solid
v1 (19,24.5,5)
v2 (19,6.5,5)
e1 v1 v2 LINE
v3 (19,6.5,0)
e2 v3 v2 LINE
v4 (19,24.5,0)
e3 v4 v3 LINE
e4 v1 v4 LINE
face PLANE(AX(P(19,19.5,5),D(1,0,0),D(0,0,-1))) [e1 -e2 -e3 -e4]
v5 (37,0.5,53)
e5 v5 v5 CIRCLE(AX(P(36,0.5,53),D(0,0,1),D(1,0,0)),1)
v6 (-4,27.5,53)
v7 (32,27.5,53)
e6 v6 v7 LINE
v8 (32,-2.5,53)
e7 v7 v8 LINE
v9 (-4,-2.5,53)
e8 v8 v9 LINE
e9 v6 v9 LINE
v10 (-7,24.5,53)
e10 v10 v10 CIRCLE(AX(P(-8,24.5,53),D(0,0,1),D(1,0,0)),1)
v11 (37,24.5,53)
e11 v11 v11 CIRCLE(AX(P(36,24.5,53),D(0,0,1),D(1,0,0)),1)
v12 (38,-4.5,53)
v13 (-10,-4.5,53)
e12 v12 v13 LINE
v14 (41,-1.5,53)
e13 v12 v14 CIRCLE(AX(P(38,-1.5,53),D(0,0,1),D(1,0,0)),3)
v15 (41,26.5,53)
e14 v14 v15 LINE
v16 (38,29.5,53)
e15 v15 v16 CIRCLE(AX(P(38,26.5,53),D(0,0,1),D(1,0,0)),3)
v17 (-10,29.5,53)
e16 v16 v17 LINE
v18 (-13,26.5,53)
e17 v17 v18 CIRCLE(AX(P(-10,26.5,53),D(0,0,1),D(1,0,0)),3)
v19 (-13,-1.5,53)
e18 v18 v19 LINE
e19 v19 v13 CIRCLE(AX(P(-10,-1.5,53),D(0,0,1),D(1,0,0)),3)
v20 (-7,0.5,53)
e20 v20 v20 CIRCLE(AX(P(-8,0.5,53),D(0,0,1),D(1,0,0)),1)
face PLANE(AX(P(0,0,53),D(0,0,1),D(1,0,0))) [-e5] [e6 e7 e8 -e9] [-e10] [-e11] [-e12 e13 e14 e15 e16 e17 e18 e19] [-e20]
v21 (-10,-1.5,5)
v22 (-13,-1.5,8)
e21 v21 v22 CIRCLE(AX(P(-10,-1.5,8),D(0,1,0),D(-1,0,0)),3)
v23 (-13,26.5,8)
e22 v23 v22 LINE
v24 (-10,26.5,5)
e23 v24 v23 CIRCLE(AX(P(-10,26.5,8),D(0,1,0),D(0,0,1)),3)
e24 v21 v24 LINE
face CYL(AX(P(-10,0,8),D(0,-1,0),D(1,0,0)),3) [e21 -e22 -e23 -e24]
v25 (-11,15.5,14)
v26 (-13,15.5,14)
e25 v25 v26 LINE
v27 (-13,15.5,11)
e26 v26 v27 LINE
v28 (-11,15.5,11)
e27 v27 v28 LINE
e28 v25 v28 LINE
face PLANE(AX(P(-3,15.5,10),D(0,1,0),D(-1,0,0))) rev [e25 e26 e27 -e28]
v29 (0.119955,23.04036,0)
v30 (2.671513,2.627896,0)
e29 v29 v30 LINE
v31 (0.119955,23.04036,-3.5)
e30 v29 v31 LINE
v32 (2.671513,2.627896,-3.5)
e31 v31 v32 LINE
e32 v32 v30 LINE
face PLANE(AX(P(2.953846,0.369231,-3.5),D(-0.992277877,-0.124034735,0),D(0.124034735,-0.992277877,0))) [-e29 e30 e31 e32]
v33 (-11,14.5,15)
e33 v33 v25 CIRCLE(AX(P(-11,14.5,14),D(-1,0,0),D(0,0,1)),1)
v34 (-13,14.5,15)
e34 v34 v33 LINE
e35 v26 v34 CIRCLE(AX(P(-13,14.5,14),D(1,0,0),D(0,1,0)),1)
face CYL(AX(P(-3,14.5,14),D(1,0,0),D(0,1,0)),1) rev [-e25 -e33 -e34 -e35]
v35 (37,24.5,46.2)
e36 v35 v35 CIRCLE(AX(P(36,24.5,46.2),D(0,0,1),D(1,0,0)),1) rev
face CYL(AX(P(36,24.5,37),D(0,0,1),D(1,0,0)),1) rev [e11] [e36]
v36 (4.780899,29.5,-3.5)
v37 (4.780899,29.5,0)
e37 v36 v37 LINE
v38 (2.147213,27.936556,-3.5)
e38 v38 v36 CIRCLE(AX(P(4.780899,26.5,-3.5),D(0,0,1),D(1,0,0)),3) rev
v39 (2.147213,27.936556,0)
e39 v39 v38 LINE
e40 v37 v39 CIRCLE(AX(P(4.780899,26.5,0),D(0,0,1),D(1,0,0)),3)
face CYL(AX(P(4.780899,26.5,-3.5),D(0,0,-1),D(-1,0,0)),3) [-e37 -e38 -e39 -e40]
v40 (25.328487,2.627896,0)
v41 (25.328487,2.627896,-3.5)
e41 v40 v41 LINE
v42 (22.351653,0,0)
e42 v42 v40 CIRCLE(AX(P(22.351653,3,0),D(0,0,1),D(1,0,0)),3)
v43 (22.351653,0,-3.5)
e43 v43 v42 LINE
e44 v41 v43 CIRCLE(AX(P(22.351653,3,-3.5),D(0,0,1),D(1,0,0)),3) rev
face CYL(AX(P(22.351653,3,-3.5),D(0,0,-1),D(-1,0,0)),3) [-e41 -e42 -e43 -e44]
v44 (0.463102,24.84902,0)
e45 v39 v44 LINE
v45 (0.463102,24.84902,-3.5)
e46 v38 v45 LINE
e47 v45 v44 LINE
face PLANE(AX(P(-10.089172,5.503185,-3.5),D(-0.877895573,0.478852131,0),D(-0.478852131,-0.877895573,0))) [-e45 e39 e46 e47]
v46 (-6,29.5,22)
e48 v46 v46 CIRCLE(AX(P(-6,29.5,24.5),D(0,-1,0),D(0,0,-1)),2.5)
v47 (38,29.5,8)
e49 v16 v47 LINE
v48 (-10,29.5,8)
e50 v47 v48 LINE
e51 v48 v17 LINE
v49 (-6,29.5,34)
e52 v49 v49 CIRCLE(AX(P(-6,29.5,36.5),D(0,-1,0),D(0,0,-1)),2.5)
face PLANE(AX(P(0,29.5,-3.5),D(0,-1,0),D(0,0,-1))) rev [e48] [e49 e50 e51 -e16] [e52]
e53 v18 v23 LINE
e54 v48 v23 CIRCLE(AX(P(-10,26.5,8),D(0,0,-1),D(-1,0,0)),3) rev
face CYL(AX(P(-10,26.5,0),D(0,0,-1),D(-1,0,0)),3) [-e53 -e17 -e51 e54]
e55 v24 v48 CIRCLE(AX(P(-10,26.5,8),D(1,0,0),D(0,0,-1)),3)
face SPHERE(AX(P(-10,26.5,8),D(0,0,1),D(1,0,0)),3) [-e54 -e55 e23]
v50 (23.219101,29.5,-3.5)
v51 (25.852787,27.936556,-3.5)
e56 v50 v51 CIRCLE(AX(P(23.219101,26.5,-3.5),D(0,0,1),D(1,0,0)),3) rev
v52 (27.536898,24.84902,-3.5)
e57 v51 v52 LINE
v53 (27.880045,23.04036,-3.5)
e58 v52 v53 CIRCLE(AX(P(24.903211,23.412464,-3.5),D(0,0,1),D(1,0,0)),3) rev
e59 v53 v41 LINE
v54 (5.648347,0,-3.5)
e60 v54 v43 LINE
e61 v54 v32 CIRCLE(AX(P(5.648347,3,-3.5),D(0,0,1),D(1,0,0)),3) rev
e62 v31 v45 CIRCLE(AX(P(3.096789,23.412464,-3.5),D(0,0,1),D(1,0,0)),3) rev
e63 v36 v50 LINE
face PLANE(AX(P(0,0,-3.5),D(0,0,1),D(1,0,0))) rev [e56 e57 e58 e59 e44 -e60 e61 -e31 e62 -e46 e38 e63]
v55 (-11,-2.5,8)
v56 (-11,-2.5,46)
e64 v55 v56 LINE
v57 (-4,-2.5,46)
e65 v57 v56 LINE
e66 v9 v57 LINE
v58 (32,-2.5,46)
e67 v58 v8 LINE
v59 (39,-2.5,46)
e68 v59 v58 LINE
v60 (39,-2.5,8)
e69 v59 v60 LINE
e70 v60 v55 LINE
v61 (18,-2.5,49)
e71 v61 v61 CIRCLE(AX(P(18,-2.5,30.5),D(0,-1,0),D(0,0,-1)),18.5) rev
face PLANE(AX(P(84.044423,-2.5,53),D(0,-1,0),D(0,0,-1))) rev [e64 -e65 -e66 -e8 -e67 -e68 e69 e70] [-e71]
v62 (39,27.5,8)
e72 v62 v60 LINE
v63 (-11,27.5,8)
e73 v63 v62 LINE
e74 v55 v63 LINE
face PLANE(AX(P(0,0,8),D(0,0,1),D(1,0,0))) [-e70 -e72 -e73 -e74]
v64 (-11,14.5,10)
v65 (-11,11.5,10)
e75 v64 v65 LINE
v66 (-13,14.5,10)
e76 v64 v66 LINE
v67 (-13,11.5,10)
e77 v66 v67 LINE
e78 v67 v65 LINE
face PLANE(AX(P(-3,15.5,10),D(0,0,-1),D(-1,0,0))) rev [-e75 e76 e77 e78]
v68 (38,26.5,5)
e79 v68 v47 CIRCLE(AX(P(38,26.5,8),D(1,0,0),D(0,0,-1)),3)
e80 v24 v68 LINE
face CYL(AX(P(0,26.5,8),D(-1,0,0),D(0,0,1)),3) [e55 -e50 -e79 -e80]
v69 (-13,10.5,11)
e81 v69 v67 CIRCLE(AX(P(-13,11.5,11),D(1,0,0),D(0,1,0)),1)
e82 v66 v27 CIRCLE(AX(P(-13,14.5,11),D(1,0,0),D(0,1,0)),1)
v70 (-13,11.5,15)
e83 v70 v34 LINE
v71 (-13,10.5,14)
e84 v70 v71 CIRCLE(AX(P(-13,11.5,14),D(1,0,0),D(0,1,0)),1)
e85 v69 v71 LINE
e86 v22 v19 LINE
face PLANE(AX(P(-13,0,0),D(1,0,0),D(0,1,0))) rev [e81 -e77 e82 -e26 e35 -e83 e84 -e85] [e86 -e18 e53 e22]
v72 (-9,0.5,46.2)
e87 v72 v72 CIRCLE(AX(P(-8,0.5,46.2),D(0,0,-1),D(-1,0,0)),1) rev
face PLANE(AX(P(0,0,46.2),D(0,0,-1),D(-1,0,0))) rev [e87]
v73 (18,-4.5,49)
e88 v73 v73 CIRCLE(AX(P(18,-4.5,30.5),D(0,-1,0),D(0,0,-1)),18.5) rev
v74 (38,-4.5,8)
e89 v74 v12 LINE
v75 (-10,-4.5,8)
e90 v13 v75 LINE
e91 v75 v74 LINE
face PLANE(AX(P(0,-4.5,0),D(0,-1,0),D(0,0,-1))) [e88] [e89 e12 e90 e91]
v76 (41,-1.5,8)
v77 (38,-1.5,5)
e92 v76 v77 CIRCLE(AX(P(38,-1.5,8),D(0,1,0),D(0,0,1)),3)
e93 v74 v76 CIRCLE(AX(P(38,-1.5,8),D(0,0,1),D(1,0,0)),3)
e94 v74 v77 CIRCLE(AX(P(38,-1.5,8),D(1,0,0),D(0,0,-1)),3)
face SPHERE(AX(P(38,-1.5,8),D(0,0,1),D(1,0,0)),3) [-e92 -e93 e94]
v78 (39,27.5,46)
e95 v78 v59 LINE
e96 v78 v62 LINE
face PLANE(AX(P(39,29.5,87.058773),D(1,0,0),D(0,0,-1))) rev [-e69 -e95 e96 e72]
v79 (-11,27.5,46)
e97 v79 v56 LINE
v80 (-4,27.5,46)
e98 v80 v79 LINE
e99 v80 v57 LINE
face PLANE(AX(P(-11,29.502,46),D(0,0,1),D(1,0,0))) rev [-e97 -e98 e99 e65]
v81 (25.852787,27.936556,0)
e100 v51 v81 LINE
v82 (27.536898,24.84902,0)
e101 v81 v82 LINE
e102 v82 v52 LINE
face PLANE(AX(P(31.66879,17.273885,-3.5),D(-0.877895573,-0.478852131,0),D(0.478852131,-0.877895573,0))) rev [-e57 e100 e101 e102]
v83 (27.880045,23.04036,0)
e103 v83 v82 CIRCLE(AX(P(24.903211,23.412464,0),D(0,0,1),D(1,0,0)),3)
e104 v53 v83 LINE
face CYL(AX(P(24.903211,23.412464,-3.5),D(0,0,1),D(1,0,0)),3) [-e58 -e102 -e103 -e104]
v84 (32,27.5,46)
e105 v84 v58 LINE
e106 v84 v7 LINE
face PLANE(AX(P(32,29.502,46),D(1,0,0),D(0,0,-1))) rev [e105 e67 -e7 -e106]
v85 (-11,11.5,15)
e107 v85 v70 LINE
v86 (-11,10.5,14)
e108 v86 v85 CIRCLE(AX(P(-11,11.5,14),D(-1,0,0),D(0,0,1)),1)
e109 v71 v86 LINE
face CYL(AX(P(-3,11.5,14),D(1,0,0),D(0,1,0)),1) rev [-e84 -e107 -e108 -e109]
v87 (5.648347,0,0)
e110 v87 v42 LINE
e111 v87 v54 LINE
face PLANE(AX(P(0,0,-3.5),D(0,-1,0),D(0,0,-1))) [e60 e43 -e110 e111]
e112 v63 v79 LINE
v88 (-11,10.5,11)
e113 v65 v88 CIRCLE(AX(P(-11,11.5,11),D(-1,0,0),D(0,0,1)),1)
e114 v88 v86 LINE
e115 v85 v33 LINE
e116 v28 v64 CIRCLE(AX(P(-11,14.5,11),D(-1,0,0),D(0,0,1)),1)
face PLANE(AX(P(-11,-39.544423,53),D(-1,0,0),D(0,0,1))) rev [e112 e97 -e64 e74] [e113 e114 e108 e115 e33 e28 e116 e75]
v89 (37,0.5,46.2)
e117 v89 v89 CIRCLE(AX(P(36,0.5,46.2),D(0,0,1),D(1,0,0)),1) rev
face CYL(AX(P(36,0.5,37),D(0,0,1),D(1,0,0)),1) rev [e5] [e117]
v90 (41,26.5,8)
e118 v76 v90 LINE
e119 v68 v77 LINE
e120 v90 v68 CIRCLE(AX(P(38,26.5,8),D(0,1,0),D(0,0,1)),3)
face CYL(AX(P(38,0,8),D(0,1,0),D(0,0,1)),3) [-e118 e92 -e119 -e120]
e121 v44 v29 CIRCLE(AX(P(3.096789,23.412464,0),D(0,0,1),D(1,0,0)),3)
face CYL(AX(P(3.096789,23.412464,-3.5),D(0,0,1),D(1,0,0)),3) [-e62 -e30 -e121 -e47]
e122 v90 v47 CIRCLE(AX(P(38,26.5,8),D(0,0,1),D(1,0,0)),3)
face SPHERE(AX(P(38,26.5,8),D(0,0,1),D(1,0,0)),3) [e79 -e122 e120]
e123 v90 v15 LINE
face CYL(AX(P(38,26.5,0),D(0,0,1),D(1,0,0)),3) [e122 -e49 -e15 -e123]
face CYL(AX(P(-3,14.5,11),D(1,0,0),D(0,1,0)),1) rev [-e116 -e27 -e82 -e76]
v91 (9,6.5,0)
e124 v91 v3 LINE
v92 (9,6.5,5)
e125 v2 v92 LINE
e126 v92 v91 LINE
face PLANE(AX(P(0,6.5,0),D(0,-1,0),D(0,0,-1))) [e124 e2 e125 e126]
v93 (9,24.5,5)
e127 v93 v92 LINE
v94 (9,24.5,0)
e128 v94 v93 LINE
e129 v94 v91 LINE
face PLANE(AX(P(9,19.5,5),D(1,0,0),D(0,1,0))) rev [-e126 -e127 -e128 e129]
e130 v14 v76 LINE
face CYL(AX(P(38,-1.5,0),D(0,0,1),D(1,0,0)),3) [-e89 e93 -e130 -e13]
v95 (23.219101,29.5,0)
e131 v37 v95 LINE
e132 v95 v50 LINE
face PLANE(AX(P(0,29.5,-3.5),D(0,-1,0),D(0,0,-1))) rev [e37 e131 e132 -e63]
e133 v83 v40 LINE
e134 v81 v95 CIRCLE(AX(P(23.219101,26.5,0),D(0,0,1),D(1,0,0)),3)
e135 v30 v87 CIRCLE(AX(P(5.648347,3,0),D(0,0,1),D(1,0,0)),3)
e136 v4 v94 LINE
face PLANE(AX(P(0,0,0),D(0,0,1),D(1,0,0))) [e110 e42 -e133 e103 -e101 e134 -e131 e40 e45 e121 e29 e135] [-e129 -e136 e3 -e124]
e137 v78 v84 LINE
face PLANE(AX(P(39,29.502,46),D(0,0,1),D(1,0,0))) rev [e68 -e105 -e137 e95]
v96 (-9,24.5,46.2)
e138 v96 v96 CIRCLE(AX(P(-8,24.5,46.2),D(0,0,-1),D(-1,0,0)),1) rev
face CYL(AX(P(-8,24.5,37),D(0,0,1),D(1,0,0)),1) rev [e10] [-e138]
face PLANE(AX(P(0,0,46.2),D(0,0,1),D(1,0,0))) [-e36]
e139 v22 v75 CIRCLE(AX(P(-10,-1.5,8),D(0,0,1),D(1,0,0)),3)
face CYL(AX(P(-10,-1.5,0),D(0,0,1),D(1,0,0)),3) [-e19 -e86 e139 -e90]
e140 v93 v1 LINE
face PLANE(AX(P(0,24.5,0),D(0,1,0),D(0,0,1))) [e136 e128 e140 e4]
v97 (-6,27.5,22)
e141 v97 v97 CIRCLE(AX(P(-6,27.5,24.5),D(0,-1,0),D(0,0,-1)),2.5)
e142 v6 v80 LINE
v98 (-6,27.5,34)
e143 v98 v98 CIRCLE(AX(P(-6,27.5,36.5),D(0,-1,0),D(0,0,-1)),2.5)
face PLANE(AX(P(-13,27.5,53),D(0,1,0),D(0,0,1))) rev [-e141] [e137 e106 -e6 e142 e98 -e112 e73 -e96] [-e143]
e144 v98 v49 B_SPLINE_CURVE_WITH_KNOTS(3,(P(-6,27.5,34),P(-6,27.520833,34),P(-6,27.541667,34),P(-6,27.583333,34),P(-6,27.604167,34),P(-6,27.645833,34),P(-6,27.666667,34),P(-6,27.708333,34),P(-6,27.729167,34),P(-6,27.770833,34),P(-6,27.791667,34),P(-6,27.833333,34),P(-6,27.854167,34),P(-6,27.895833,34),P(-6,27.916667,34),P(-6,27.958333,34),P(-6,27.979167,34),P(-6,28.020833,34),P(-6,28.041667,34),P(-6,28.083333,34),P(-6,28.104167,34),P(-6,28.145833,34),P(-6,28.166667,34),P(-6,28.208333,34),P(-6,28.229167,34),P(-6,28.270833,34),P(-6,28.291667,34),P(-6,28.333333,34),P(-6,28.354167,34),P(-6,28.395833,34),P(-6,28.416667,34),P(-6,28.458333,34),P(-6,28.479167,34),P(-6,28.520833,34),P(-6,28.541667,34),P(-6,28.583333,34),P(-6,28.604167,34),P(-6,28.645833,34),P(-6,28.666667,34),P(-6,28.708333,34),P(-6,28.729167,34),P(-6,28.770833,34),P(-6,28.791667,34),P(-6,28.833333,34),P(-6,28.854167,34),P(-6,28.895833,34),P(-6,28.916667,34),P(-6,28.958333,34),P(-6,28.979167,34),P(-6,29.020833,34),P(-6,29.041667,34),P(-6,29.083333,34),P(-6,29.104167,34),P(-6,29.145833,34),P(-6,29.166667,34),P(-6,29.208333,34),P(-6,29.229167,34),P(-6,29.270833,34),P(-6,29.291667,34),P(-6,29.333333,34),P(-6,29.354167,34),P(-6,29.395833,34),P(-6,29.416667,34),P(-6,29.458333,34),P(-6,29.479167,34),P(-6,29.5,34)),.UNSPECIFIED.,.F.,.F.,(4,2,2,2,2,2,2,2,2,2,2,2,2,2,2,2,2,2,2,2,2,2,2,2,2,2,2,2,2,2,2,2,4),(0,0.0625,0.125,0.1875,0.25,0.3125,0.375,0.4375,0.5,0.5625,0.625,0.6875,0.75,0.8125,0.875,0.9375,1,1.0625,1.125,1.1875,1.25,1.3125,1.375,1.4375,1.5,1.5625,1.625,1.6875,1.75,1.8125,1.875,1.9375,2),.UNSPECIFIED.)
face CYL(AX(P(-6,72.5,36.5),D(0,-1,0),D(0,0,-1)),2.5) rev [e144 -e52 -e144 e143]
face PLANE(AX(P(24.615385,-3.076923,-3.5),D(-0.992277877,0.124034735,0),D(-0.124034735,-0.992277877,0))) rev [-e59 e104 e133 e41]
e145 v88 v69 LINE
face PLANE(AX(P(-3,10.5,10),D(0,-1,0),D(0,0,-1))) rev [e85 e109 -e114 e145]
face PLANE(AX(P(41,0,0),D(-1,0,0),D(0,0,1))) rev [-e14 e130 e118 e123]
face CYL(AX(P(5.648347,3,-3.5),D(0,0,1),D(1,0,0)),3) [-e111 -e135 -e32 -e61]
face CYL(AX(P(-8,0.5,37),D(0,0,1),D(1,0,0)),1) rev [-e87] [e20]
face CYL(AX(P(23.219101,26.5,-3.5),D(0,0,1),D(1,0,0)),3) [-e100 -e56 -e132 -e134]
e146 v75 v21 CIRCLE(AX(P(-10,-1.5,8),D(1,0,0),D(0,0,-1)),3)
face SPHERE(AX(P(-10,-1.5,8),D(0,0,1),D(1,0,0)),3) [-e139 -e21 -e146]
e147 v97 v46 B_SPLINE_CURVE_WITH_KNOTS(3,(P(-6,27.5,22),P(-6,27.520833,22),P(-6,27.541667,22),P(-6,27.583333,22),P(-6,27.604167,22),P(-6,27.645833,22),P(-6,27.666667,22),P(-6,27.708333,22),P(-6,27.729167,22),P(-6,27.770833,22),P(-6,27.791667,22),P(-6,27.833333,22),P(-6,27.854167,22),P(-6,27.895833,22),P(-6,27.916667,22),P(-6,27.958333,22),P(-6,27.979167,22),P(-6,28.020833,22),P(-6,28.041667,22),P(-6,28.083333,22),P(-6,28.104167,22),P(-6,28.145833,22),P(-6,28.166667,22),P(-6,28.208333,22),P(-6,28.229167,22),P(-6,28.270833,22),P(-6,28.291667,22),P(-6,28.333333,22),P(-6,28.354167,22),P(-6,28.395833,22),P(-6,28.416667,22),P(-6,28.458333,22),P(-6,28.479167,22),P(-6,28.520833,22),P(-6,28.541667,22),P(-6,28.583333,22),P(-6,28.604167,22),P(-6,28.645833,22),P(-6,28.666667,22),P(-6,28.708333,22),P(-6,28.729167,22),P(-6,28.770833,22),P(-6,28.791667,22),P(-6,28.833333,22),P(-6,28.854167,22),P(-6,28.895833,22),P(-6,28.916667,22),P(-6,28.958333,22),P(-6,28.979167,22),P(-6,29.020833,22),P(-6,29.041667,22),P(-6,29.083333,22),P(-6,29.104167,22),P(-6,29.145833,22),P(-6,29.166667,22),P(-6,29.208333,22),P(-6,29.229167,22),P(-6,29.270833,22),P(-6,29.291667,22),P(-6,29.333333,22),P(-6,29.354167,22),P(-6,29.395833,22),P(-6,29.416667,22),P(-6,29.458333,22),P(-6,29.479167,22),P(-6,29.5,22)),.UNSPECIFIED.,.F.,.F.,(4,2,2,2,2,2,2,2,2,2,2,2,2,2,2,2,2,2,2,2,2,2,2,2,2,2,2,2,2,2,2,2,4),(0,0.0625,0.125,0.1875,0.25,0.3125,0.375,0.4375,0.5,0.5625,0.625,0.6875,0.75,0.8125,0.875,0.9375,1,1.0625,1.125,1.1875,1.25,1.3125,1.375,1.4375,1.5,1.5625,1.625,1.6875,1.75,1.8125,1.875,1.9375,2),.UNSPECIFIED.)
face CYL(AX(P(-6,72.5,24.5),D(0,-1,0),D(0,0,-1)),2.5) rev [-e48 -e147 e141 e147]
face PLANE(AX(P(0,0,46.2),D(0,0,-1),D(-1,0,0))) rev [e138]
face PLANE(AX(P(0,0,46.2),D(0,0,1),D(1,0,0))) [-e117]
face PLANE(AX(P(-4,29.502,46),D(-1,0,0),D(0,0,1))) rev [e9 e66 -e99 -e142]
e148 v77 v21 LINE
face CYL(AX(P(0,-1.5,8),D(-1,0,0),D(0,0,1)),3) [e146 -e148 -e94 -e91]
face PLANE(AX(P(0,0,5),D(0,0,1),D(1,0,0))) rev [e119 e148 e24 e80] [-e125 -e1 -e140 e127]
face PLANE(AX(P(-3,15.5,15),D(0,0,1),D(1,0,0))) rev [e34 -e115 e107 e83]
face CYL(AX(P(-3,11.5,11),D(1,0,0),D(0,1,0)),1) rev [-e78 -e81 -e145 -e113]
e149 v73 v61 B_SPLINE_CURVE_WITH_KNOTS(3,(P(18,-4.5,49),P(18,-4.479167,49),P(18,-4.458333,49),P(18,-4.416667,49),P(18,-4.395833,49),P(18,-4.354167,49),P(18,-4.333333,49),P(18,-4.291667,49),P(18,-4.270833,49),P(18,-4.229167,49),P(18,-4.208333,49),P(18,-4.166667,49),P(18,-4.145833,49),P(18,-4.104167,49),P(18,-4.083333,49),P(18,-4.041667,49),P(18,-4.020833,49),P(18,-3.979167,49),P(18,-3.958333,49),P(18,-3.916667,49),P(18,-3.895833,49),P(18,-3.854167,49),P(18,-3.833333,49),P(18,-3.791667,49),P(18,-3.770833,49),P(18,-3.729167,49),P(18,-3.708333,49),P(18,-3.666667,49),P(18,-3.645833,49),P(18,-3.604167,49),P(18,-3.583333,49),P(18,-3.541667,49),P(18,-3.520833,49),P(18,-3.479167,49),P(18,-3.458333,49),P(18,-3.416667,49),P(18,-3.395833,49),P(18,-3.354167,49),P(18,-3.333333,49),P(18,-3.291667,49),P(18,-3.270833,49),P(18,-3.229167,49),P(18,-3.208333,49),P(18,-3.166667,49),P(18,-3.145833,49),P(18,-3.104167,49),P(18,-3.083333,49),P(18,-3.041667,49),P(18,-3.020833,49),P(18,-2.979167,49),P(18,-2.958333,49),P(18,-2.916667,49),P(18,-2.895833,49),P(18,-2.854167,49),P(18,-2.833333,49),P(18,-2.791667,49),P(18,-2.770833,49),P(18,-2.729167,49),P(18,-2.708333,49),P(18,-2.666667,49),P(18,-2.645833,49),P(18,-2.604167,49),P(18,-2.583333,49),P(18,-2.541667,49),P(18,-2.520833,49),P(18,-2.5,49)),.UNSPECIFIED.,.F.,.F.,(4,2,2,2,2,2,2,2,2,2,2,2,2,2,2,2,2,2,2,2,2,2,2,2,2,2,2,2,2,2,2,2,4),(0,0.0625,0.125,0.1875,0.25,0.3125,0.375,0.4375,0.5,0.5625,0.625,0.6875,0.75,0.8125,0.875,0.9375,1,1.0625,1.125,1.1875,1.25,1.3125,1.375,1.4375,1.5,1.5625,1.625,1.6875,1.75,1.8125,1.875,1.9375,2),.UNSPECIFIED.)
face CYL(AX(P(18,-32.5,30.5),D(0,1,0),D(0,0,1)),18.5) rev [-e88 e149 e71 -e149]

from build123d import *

# Parameters (mm, degrees)
BOSS_EXTRUDE1_DEPTH  = 3.5
SKETCH2_W            = 10
SKETCH2_H            = 3
BOSS_EXTRUDE2_DEPTH  = 5
SKETCH3_W            = 50
SKETCH3_H            = 24
BOSS_EXTRUDE3_DEPTH  = 3
SKETCH4_W            = 50
SKETCH4_H            = 3
BOSS_EXTRUDE4_DEPTH  = 35
SKETCH5_W            = 4
SKETCH5_H            = 29
CUT_EXTRUDE3_DEPTH   = 35
FILLET1_R            = 2
SKETCH6_R            = 3.175
BOSS_EXTRUDE6_DEPTH  = 35
FILLET2_R            = 3
SKETCH8_W            = 10
SKETCH8_H            = 5
BOSS_EXTRUDE7_DEPTH  = 10
SKETCH9_W            = 10
SKETCH9_H            = 5
BOSS_EXTRUDE8_DEPTH  = 10
SKETCH10_W           = 53.514300768
SKETCH10_H           = 42.489179877
CUT_EXTRUDE4_DEPTH   = 20
BOSS_EXTRUDE9_DEPTH  = 40
SKETCH13_W           = 40
SKETCH13_H           = 10
BOSS_EXTRUDE10_DEPTH = 20
SKETCH14_W           = 4
SKETCH14_H           = 20
CUT_EXTRUDE7_DEPTH   = 20
FILLET3_R            = 2
SKETCH16_W           = 40
SKETCH16_H           = 10
CUT_EXTRUDE9_DEPTH   = 4
SKETCH19_W           = 40
SKETCH19_H           = 10
CUT_EXTRUDE10_DEPTH  = 24
SKETCH20_W           = 4
SKETCH20_H           = 2
CUT_EXTRUDE11_DEPTH  = 44
FILLET4_R            = 10
SKETCH21_W           = 58
SKETCH21_H           = 24
BOSS_EXTRUDE11_DEPTH = 2
SKETCH22_W           = 54.310686521
SKETCH22_H           = 40
CUT_EXTRUDE14_DEPTH  = 57
SKETCH24_W           = 10
SKETCH24_H           = 5
CUT_EXTRUDE15_DEPTH  = 5
SKETCH25_W           = 52
SKETCH25_H           = 2
BOSS_EXTRUDE12_DEPTH = 45
SKETCH26_W           = 2
SKETCH26_H           = 45
BOSS_EXTRUDE13_DEPTH = 22
SKETCH27_R           = 2.5
CUT_EXTRUDE16_DEPTH  = 45
SKETCH29_W           = 2
SKETCH29_H           = 45
BOSS_EXTRUDE14_DEPTH = 10
SKETCH30_W           = 45
SKETCH30_H           = 2
BOSS_EXTRUDE15_DEPTH = 50
SKETCH31_R           = 18.5
CUT_EXTRUDE17_DEPTH  = 60
SKETCH32_W           = 3
SKETCH32_H           = 34
BOSS_EXTRUDE17_DEPTH = 2
SKETCH33_W           = 2
SKETCH33_H           = 34
BOSS_EXTRUDE18_DEPTH = 45
BOSS_EXTRUDE20_REACH = 76.256
SKETCH37_W           = 7
SKETCH37_H           = 7
SKETCH38_R           = 1
CUT_EXTRUDE18_DEPTH  = 16
FILLET5_R            = 3
FILLET6_R            = 3
SKETCH39_W           = 5
SKETCH39_H           = 5
CUT_EXTRUDE22_DEPTH  = 10
FILLET7_R            = 1
SKETCH40_W           = 7
SKETCH40_H           = 30
BOSS_EXTRUDE21_DEPTH = 0.2


# Some blends are built 0.0001 mm under size
with BuildPart() as part:
    # Sketch1 → Boss-Extrude1 (new body)
    with BuildSketch(Plane.XY):
        Polygon((0, 24), (3, 0), (25, 0), (28, 24), (25, 29.5), (3, 29.5), align=None)
    extrude(amount=-BOSS_EXTRUDE1_DEPTH)

    # Sketch2 → Boss-Extrude2 (add)
    with BuildSketch(Plane.XY):
        with Locations((14, 18)):
            Rectangle(SKETCH2_W, SKETCH2_H)
    extrude(amount=BOSS_EXTRUDE2_DEPTH)

    # Sketch3 → Boss-Extrude3 (add)
    with BuildSketch(Plane.XY.offset(5)):
        with Locations((14, 17.5)):
            Rectangle(SKETCH3_W, SKETCH3_H)
    extrude(amount=BOSS_EXTRUDE3_DEPTH)

    # Sketch4 → Boss-Extrude4 (add)
    with BuildSketch(Plane.XY.offset(8)):
        with Locations((14, 28)):
            Rectangle(SKETCH4_W, SKETCH4_H)
    extrude(amount=BOSS_EXTRUDE4_DEPTH)

    # Sketch5 → Cut-Extrude3 (cut)
    with BuildSketch(Plane(origin=(0, 29.5, 0), x_dir=(1, 0, 0), z_dir=(0, 1, 0))):
        with Locations((-6, -25.5)):
            Rectangle(SKETCH5_W, SKETCH5_H)
    extrude(amount=-CUT_EXTRUDE3_DEPTH, mode=Mode.SUBTRACT)

    # Fillet1
    fillet1_edges = [part.edges().sort_by_distance(p)[0] for p in [
        (-8, 28, 40),
        (-4, 28, 40),
        (-4, 28, 11),
        (-8, 28, 11),
    ]]
    fillet(fillet1_edges, radius=FILLET1_R - 0.0001)  # a hair under: the kernel refuses the full size

    # Sketch6 → Boss-Extrude6 (add)
    with BuildSketch(Plane(origin=(39, 0, 0), x_dir=(0, 0, -1), z_dir=(1, 0, 0))):
        with BuildLine():
            Line((-29.274917218, 38.5), (-43, 29.5))
            Line((-43, 29.5), (-5, 29.5))
            Line((-5, 29.5), (-21.725082782, 38.5))
            ThreePointArc((-21.725082782, 38.5), (-25.5, 40), (-29.274917218, 38.5))
        make_face()
        with Locations((-25.5, 34.5)):
            Circle(SKETCH6_R, mode=Mode.SUBTRACT)
    extrude(amount=-BOSS_EXTRUDE6_DEPTH)

    # Fillet2
    fillet2_edges = [part.edges().sort_by_distance(p)[0] for p in [
        (25, 0, -1.75),
        (3, 0, -1.75),
        (0, 24, -1.75),
        (3, 29.5, -1.75),
        (25, 29.5, -1.75),
        (28, 24, -1.75),
    ]]
    fillet(fillet2_edges, radius=FILLET2_R)

    # Sketch8 → Boss-Extrude7 (add)
    with BuildSketch(Plane(origin=(0, 19.5, 0), x_dir=(1, 0, 0), z_dir=(0, 1, 0))):
        with Locations((14, -2.5)):
            Rectangle(SKETCH8_W, SKETCH8_H)
    extrude(amount=BOSS_EXTRUDE7_DEPTH)

    # Sketch9 → Boss-Extrude8 (add)
    with BuildSketch(Plane.XZ.offset(-16.5)):
        with Locations((14, 2.5)):
            Rectangle(SKETCH9_W, SKETCH9_H)
    extrude(amount=BOSS_EXTRUDE8_DEPTH)

    # Sketch10 → Cut-Extrude4 (cut)
    with BuildSketch(Plane(origin=(0, 29.5, 0), x_dir=(1, 0, 0), z_dir=(0, 1, 0))):
        with Locations((30.757150384, -26.244589939)):
            Rectangle(SKETCH10_W, SKETCH10_H)
    extrude(amount=CUT_EXTRUDE4_DEPTH, mode=Mode.SUBTRACT)

    # Sketch11 → Boss-Extrude9 (add)
    with BuildSketch(Plane(origin=(39, 0, 0), x_dir=(0, 0, -1), z_dir=(1, 0, 0))):
        with BuildLine():
            Line((-43, 39.5), (-43, 29.5))
            Line((-43, 29.5), (-24, 29.5))
            Line((-24, 29.5), (-24, 34.5))
            ThreePointArc((-24, 34.5), (-27.535533906, 35.964466094), (-29, 39.5))
            Line((-29, 39.5), (-43, 39.5))
        make_face()
        with BuildLine():
            Line((-24, 34.5), (-24, 29.5))
            Line((-24, 29.5), (-5, 29.5))
            Line((-5, 29.5), (-5, 39.5))
            Line((-5, 39.5), (-19, 39.5))
            ThreePointArc((-19, 39.5), (-20.464466094, 35.964466094), (-24, 34.5))
        make_face()
    extrude(amount=-BOSS_EXTRUDE9_DEPTH)

    # Sketch13 → Boss-Extrude10 (add)
    with BuildSketch(Plane.XY.offset(43)):
        with Locations((19, 34.5)):
            Rectangle(SKETCH13_W, SKETCH13_H)
        Polygon((-1, 29.5), (-11, 29.5), (-11, 26.5), (39, 26.5), (39, 29.5), align=None)
    extrude(amount=BOSS_EXTRUDE10_DEPTH)

    # Sketch14 → Cut-Extrude7 (cut)
    with BuildSketch(Plane(origin=(0, 29.5, 0), x_dir=(1, 0, 0), z_dir=(0, 1, 0))):
        with Locations((-6, -48)):
            Rectangle(SKETCH14_W, SKETCH14_H)
    extrude(amount=-CUT_EXTRUDE7_DEPTH, mode=Mode.SUBTRACT)

    # Fillet3
    fillet3_edges = [part.edges().sort_by_distance(p)[0] for p in [
        (-8, 28, 58),
        (-4, 28, 58),
    ]]
    fillet(fillet3_edges, radius=FILLET3_R - 0.0001)  # a hair under: the kernel refuses the full size

    # Sketch16 → Cut-Extrude9 (cut)
    with BuildSketch(Plane(origin=(0, 0, 5), x_dir=(-1, 0, 0), z_dir=(0, 0, -1))):
        with Locations((-19, 34.5)):
            Rectangle(SKETCH16_W, SKETCH16_H)
    extrude(amount=-CUT_EXTRUDE9_DEPTH, mode=Mode.SUBTRACT)

    # Sketch19 → Cut-Extrude10 (cut)
    with BuildSketch(Plane.XY.offset(63)):
        with Locations((19, 34.5)):
            Rectangle(SKETCH19_W, SKETCH19_H)
    extrude(amount=-CUT_EXTRUDE10_DEPTH, mode=Mode.SUBTRACT)

    # Sketch20 → Cut-Extrude11 (cut)
    with BuildSketch(Plane.XY.offset(39)):
        with Locations((6, 31.5)):
            Rectangle(SKETCH20_W, SKETCH20_H)
        with Locations((32, 31.5)):
            Rectangle(SKETCH20_W, SKETCH20_H)
    extrude(amount=-CUT_EXTRUDE11_DEPTH, mode=Mode.SUBTRACT)

    # Fillet4
    # the kernel refuses this fillet: 10 mm, written as the material it takes off along each edge
    with BuildSketch(Plane(origin=(-26, 39.5, 9), x_dir=(0, 0, 1), z_dir=(1, 0, 0)), Plane(origin=(-26, 39.5, 39), x_dir=(0, -1, 0), z_dir=(1, 0, 0))) as fillet4_piece_1:
        with BuildLine():
            CenterArc((FILLET4_R, FILLET4_R), FILLET4_R, 180, 90)
            Line((0, FILLET4_R), (0, 0))
            Line((0, 0), (FILLET4_R, 0))
        make_face()
    extrude(amount=90, mode=Mode.SUBTRACT)

    # Sketch21 → Boss-Extrude11 (add)
    with BuildSketch(Plane.ZY.offset(11)):
        with Locations((34, 17.5)):
            Rectangle(SKETCH21_W, SKETCH21_H)
    extrude(amount=BOSS_EXTRUDE11_DEPTH)

    # Sketch22 → Cut-Extrude14 (cut)
    with BuildSketch(Plane.XY.offset(65)):
        with Locations((13.590652361, 21.5)):
            Rectangle(SKETCH22_W, SKETCH22_H)
    extrude(amount=-CUT_EXTRUDE14_DEPTH, mode=Mode.SUBTRACT)

    # Sketch24 → Cut-Extrude15 (cut)
    with BuildSketch(Plane(origin=(0, 29.5, 0), x_dir=(1, 0, 0), z_dir=(0, 1, 0))):
        with Locations((14, -2.5)):
            Rectangle(SKETCH24_W, SKETCH24_H)
    extrude(amount=-CUT_EXTRUDE15_DEPTH, mode=Mode.SUBTRACT)

    # Sketch25 → Boss-Extrude12 (add)
    with BuildSketch(Plane.XY.offset(8)):
        with Locations((13, 28.5)):
            Rectangle(SKETCH25_W, SKETCH25_H)
    extrude(amount=BOSS_EXTRUDE12_DEPTH)

    # Sketch26 → Boss-Extrude13 (add)
    with BuildSketch(Plane.XZ.offset(-27.5)):
        with Locations((-12, 30.5)):
            Rectangle(SKETCH26_W, SKETCH26_H)
    extrude(amount=BOSS_EXTRUDE13_DEPTH)

    # Sketch27 → Cut-Extrude16 (cut)
    with BuildSketch(Plane.XZ.offset(-27.5)):
        with Locations(Location((-6, 36.5, 0), (0, 0, 270))):
            Circle(SKETCH27_R)
        with Locations(Location((-6, 24.5, 0), (0, 0, 270))):
            Circle(SKETCH27_R)
    extrude(amount=-CUT_EXTRUDE16_DEPTH, mode=Mode.SUBTRACT)

    # Sketch29 → Boss-Extrude14 (add)
    with BuildSketch(Plane.XZ.offset(-5.5)):
        with Locations((-12, 30.5)):
            Rectangle(SKETCH29_W, SKETCH29_H)
        Polygon((-11, 8), (-13, 8), (-13, 5), (39, 5), (39, 8), align=None)
    extrude(amount=BOSS_EXTRUDE14_DEPTH)

    # Sketch30 → Boss-Extrude15 (add)
    with BuildSketch(Plane(origin=(-11, 0, 0), x_dir=(0, 0, -1), z_dir=(1, 0, 0))):
        with Locations((-30.5, -3.5)):
            Rectangle(SKETCH30_W, SKETCH30_H)
    extrude(amount=BOSS_EXTRUDE15_DEPTH)

    # Sketch31 → Cut-Extrude17 (cut)
    with BuildSketch(Plane.XZ.offset(-27.5)):
        with Locations(Location((18, 30.5, 0), (0, 0, 90))):
            Circle(SKETCH31_R)
    extrude(amount=CUT_EXTRUDE17_DEPTH, mode=Mode.SUBTRACT)

    # Sketch32 → Boss-Extrude17 (add)
    with BuildSketch(Plane(origin=(39, 0, 0), x_dir=(0, 0, -1), z_dir=(1, 0, 0))):
        with Locations((-6.5, 12.5)):
            Rectangle(SKETCH32_W, SKETCH32_H)
    extrude(amount=BOSS_EXTRUDE17_DEPTH)

    # Sketch33 → Boss-Extrude18 (add)
    with BuildSketch(Plane.XY.offset(8)):
        with Locations((40, 12.5)):
            Rectangle(SKETCH33_W, SKETCH33_H)
    extrude(amount=BOSS_EXTRUDE18_DEPTH)

    # Sketch37 → Boss-Extrude20 (add, up to next)
    with BuildSketch(Plane(origin=(0, -2.5, 0), x_dir=(1, 0, 0), z_dir=(0, 1, 0)), mode=Mode.PRIVATE) as boss_extrude20_sk1:
        with Locations((-7.5, -49.5)):
            Rectangle(SKETCH37_W, SKETCH37_H)
    boss_extrude20_tool1 = extrude(boss_extrude20_sk1.sketch, amount=BOSS_EXTRUDE20_REACH, mode=Mode.PRIVATE) - part.part
    # Sketch37 → Boss-Extrude20 (add, up to next)
    with BuildSketch(Plane(origin=(0, -2.5, 0), x_dir=(1, 0, 0), z_dir=(0, 1, 0)), mode=Mode.PRIVATE) as boss_extrude20_sk2:
        with Locations((35.5, -49.5)):
            Rectangle(SKETCH37_W, SKETCH37_H)
    boss_extrude20_tool2 = extrude(boss_extrude20_sk2.sketch, amount=BOSS_EXTRUDE20_REACH, mode=Mode.PRIVATE) - part.part
    add(boss_extrude20_tool1.solids().sort_by_distance((-7.5, -2.5, 49.5))[0])
    add(boss_extrude20_tool2.solids().sort_by_distance((35.5, -2.5, 49.5))[0])

    # Sketch38 → Cut-Extrude18 (cut)
    with BuildSketch(Plane.XY.offset(53)):
        with Locations((-8, 24.5)):
            Circle(SKETCH38_R)
        with Locations((-8, 0.5)):
            Circle(SKETCH38_R)
        with Locations((36, 24.5)):
            Circle(SKETCH38_R)
        with Locations((36, 0.5)):
            Circle(SKETCH38_R)
    extrude(amount=-CUT_EXTRUDE18_DEPTH, mode=Mode.SUBTRACT)

    # Fillet5
    fillet5_edges = [part.edges().sort_by_distance(p)[0] for p in [
        (-13, 29.5, 29),
        (-13, -4.5, 29),
        (41, 29.5, 29),
        (41, -4.5, 29),
    ]]
    fillet(fillet5_edges, radius=FILLET5_R)

    # Fillet6
    fillet6_edges = [part.edges().sort_by_distance(p)[0] for p in [
        (14, -4.5, 5),
        (14, 29.5, 5),
        (41, 12.5, 5),
        (-13, 12.5, 5),
        (40.121320344, 28.621320344, 5),
        (40.121320344, -3.621320344, 5),
        (-12.121320344, 28.621320344, 5),
        (-12.121320344, -3.621320344, 5),
    ]]
    fillet(fillet6_edges, radius=FILLET6_R)

    # Sketch39 → Cut-Extrude22 (cut)
    with BuildSketch(Plane.ZY.offset(13)):
        with Locations((12.5, 13)):
            Rectangle(SKETCH39_W, SKETCH39_H)
    extrude(amount=-CUT_EXTRUDE22_DEPTH, mode=Mode.SUBTRACT)

    # Fillet7
    fillet7_edges = [part.edges().sort_by_distance(p)[0] for p in [
        (-12, 10.5, 10),
        (-12, 15.5, 10),
        (-12, 15.5, 15),
        (-12, 10.5, 15),
    ]]
    fillet(fillet7_edges, radius=FILLET7_R)

    # Sketch40 → Boss-Extrude21 (add)
    with BuildSketch(Plane.XY.offset(46)):
        with Locations((-7.5, 12.5)):
            Rectangle(SKETCH40_W, SKETCH40_H)
        with Locations((35.5, 12.5)):
            Rectangle(SKETCH40_W, SKETCH40_H)
    extrude(amount=BOSS_EXTRUDE21_DEPTH)


solid = part.part
